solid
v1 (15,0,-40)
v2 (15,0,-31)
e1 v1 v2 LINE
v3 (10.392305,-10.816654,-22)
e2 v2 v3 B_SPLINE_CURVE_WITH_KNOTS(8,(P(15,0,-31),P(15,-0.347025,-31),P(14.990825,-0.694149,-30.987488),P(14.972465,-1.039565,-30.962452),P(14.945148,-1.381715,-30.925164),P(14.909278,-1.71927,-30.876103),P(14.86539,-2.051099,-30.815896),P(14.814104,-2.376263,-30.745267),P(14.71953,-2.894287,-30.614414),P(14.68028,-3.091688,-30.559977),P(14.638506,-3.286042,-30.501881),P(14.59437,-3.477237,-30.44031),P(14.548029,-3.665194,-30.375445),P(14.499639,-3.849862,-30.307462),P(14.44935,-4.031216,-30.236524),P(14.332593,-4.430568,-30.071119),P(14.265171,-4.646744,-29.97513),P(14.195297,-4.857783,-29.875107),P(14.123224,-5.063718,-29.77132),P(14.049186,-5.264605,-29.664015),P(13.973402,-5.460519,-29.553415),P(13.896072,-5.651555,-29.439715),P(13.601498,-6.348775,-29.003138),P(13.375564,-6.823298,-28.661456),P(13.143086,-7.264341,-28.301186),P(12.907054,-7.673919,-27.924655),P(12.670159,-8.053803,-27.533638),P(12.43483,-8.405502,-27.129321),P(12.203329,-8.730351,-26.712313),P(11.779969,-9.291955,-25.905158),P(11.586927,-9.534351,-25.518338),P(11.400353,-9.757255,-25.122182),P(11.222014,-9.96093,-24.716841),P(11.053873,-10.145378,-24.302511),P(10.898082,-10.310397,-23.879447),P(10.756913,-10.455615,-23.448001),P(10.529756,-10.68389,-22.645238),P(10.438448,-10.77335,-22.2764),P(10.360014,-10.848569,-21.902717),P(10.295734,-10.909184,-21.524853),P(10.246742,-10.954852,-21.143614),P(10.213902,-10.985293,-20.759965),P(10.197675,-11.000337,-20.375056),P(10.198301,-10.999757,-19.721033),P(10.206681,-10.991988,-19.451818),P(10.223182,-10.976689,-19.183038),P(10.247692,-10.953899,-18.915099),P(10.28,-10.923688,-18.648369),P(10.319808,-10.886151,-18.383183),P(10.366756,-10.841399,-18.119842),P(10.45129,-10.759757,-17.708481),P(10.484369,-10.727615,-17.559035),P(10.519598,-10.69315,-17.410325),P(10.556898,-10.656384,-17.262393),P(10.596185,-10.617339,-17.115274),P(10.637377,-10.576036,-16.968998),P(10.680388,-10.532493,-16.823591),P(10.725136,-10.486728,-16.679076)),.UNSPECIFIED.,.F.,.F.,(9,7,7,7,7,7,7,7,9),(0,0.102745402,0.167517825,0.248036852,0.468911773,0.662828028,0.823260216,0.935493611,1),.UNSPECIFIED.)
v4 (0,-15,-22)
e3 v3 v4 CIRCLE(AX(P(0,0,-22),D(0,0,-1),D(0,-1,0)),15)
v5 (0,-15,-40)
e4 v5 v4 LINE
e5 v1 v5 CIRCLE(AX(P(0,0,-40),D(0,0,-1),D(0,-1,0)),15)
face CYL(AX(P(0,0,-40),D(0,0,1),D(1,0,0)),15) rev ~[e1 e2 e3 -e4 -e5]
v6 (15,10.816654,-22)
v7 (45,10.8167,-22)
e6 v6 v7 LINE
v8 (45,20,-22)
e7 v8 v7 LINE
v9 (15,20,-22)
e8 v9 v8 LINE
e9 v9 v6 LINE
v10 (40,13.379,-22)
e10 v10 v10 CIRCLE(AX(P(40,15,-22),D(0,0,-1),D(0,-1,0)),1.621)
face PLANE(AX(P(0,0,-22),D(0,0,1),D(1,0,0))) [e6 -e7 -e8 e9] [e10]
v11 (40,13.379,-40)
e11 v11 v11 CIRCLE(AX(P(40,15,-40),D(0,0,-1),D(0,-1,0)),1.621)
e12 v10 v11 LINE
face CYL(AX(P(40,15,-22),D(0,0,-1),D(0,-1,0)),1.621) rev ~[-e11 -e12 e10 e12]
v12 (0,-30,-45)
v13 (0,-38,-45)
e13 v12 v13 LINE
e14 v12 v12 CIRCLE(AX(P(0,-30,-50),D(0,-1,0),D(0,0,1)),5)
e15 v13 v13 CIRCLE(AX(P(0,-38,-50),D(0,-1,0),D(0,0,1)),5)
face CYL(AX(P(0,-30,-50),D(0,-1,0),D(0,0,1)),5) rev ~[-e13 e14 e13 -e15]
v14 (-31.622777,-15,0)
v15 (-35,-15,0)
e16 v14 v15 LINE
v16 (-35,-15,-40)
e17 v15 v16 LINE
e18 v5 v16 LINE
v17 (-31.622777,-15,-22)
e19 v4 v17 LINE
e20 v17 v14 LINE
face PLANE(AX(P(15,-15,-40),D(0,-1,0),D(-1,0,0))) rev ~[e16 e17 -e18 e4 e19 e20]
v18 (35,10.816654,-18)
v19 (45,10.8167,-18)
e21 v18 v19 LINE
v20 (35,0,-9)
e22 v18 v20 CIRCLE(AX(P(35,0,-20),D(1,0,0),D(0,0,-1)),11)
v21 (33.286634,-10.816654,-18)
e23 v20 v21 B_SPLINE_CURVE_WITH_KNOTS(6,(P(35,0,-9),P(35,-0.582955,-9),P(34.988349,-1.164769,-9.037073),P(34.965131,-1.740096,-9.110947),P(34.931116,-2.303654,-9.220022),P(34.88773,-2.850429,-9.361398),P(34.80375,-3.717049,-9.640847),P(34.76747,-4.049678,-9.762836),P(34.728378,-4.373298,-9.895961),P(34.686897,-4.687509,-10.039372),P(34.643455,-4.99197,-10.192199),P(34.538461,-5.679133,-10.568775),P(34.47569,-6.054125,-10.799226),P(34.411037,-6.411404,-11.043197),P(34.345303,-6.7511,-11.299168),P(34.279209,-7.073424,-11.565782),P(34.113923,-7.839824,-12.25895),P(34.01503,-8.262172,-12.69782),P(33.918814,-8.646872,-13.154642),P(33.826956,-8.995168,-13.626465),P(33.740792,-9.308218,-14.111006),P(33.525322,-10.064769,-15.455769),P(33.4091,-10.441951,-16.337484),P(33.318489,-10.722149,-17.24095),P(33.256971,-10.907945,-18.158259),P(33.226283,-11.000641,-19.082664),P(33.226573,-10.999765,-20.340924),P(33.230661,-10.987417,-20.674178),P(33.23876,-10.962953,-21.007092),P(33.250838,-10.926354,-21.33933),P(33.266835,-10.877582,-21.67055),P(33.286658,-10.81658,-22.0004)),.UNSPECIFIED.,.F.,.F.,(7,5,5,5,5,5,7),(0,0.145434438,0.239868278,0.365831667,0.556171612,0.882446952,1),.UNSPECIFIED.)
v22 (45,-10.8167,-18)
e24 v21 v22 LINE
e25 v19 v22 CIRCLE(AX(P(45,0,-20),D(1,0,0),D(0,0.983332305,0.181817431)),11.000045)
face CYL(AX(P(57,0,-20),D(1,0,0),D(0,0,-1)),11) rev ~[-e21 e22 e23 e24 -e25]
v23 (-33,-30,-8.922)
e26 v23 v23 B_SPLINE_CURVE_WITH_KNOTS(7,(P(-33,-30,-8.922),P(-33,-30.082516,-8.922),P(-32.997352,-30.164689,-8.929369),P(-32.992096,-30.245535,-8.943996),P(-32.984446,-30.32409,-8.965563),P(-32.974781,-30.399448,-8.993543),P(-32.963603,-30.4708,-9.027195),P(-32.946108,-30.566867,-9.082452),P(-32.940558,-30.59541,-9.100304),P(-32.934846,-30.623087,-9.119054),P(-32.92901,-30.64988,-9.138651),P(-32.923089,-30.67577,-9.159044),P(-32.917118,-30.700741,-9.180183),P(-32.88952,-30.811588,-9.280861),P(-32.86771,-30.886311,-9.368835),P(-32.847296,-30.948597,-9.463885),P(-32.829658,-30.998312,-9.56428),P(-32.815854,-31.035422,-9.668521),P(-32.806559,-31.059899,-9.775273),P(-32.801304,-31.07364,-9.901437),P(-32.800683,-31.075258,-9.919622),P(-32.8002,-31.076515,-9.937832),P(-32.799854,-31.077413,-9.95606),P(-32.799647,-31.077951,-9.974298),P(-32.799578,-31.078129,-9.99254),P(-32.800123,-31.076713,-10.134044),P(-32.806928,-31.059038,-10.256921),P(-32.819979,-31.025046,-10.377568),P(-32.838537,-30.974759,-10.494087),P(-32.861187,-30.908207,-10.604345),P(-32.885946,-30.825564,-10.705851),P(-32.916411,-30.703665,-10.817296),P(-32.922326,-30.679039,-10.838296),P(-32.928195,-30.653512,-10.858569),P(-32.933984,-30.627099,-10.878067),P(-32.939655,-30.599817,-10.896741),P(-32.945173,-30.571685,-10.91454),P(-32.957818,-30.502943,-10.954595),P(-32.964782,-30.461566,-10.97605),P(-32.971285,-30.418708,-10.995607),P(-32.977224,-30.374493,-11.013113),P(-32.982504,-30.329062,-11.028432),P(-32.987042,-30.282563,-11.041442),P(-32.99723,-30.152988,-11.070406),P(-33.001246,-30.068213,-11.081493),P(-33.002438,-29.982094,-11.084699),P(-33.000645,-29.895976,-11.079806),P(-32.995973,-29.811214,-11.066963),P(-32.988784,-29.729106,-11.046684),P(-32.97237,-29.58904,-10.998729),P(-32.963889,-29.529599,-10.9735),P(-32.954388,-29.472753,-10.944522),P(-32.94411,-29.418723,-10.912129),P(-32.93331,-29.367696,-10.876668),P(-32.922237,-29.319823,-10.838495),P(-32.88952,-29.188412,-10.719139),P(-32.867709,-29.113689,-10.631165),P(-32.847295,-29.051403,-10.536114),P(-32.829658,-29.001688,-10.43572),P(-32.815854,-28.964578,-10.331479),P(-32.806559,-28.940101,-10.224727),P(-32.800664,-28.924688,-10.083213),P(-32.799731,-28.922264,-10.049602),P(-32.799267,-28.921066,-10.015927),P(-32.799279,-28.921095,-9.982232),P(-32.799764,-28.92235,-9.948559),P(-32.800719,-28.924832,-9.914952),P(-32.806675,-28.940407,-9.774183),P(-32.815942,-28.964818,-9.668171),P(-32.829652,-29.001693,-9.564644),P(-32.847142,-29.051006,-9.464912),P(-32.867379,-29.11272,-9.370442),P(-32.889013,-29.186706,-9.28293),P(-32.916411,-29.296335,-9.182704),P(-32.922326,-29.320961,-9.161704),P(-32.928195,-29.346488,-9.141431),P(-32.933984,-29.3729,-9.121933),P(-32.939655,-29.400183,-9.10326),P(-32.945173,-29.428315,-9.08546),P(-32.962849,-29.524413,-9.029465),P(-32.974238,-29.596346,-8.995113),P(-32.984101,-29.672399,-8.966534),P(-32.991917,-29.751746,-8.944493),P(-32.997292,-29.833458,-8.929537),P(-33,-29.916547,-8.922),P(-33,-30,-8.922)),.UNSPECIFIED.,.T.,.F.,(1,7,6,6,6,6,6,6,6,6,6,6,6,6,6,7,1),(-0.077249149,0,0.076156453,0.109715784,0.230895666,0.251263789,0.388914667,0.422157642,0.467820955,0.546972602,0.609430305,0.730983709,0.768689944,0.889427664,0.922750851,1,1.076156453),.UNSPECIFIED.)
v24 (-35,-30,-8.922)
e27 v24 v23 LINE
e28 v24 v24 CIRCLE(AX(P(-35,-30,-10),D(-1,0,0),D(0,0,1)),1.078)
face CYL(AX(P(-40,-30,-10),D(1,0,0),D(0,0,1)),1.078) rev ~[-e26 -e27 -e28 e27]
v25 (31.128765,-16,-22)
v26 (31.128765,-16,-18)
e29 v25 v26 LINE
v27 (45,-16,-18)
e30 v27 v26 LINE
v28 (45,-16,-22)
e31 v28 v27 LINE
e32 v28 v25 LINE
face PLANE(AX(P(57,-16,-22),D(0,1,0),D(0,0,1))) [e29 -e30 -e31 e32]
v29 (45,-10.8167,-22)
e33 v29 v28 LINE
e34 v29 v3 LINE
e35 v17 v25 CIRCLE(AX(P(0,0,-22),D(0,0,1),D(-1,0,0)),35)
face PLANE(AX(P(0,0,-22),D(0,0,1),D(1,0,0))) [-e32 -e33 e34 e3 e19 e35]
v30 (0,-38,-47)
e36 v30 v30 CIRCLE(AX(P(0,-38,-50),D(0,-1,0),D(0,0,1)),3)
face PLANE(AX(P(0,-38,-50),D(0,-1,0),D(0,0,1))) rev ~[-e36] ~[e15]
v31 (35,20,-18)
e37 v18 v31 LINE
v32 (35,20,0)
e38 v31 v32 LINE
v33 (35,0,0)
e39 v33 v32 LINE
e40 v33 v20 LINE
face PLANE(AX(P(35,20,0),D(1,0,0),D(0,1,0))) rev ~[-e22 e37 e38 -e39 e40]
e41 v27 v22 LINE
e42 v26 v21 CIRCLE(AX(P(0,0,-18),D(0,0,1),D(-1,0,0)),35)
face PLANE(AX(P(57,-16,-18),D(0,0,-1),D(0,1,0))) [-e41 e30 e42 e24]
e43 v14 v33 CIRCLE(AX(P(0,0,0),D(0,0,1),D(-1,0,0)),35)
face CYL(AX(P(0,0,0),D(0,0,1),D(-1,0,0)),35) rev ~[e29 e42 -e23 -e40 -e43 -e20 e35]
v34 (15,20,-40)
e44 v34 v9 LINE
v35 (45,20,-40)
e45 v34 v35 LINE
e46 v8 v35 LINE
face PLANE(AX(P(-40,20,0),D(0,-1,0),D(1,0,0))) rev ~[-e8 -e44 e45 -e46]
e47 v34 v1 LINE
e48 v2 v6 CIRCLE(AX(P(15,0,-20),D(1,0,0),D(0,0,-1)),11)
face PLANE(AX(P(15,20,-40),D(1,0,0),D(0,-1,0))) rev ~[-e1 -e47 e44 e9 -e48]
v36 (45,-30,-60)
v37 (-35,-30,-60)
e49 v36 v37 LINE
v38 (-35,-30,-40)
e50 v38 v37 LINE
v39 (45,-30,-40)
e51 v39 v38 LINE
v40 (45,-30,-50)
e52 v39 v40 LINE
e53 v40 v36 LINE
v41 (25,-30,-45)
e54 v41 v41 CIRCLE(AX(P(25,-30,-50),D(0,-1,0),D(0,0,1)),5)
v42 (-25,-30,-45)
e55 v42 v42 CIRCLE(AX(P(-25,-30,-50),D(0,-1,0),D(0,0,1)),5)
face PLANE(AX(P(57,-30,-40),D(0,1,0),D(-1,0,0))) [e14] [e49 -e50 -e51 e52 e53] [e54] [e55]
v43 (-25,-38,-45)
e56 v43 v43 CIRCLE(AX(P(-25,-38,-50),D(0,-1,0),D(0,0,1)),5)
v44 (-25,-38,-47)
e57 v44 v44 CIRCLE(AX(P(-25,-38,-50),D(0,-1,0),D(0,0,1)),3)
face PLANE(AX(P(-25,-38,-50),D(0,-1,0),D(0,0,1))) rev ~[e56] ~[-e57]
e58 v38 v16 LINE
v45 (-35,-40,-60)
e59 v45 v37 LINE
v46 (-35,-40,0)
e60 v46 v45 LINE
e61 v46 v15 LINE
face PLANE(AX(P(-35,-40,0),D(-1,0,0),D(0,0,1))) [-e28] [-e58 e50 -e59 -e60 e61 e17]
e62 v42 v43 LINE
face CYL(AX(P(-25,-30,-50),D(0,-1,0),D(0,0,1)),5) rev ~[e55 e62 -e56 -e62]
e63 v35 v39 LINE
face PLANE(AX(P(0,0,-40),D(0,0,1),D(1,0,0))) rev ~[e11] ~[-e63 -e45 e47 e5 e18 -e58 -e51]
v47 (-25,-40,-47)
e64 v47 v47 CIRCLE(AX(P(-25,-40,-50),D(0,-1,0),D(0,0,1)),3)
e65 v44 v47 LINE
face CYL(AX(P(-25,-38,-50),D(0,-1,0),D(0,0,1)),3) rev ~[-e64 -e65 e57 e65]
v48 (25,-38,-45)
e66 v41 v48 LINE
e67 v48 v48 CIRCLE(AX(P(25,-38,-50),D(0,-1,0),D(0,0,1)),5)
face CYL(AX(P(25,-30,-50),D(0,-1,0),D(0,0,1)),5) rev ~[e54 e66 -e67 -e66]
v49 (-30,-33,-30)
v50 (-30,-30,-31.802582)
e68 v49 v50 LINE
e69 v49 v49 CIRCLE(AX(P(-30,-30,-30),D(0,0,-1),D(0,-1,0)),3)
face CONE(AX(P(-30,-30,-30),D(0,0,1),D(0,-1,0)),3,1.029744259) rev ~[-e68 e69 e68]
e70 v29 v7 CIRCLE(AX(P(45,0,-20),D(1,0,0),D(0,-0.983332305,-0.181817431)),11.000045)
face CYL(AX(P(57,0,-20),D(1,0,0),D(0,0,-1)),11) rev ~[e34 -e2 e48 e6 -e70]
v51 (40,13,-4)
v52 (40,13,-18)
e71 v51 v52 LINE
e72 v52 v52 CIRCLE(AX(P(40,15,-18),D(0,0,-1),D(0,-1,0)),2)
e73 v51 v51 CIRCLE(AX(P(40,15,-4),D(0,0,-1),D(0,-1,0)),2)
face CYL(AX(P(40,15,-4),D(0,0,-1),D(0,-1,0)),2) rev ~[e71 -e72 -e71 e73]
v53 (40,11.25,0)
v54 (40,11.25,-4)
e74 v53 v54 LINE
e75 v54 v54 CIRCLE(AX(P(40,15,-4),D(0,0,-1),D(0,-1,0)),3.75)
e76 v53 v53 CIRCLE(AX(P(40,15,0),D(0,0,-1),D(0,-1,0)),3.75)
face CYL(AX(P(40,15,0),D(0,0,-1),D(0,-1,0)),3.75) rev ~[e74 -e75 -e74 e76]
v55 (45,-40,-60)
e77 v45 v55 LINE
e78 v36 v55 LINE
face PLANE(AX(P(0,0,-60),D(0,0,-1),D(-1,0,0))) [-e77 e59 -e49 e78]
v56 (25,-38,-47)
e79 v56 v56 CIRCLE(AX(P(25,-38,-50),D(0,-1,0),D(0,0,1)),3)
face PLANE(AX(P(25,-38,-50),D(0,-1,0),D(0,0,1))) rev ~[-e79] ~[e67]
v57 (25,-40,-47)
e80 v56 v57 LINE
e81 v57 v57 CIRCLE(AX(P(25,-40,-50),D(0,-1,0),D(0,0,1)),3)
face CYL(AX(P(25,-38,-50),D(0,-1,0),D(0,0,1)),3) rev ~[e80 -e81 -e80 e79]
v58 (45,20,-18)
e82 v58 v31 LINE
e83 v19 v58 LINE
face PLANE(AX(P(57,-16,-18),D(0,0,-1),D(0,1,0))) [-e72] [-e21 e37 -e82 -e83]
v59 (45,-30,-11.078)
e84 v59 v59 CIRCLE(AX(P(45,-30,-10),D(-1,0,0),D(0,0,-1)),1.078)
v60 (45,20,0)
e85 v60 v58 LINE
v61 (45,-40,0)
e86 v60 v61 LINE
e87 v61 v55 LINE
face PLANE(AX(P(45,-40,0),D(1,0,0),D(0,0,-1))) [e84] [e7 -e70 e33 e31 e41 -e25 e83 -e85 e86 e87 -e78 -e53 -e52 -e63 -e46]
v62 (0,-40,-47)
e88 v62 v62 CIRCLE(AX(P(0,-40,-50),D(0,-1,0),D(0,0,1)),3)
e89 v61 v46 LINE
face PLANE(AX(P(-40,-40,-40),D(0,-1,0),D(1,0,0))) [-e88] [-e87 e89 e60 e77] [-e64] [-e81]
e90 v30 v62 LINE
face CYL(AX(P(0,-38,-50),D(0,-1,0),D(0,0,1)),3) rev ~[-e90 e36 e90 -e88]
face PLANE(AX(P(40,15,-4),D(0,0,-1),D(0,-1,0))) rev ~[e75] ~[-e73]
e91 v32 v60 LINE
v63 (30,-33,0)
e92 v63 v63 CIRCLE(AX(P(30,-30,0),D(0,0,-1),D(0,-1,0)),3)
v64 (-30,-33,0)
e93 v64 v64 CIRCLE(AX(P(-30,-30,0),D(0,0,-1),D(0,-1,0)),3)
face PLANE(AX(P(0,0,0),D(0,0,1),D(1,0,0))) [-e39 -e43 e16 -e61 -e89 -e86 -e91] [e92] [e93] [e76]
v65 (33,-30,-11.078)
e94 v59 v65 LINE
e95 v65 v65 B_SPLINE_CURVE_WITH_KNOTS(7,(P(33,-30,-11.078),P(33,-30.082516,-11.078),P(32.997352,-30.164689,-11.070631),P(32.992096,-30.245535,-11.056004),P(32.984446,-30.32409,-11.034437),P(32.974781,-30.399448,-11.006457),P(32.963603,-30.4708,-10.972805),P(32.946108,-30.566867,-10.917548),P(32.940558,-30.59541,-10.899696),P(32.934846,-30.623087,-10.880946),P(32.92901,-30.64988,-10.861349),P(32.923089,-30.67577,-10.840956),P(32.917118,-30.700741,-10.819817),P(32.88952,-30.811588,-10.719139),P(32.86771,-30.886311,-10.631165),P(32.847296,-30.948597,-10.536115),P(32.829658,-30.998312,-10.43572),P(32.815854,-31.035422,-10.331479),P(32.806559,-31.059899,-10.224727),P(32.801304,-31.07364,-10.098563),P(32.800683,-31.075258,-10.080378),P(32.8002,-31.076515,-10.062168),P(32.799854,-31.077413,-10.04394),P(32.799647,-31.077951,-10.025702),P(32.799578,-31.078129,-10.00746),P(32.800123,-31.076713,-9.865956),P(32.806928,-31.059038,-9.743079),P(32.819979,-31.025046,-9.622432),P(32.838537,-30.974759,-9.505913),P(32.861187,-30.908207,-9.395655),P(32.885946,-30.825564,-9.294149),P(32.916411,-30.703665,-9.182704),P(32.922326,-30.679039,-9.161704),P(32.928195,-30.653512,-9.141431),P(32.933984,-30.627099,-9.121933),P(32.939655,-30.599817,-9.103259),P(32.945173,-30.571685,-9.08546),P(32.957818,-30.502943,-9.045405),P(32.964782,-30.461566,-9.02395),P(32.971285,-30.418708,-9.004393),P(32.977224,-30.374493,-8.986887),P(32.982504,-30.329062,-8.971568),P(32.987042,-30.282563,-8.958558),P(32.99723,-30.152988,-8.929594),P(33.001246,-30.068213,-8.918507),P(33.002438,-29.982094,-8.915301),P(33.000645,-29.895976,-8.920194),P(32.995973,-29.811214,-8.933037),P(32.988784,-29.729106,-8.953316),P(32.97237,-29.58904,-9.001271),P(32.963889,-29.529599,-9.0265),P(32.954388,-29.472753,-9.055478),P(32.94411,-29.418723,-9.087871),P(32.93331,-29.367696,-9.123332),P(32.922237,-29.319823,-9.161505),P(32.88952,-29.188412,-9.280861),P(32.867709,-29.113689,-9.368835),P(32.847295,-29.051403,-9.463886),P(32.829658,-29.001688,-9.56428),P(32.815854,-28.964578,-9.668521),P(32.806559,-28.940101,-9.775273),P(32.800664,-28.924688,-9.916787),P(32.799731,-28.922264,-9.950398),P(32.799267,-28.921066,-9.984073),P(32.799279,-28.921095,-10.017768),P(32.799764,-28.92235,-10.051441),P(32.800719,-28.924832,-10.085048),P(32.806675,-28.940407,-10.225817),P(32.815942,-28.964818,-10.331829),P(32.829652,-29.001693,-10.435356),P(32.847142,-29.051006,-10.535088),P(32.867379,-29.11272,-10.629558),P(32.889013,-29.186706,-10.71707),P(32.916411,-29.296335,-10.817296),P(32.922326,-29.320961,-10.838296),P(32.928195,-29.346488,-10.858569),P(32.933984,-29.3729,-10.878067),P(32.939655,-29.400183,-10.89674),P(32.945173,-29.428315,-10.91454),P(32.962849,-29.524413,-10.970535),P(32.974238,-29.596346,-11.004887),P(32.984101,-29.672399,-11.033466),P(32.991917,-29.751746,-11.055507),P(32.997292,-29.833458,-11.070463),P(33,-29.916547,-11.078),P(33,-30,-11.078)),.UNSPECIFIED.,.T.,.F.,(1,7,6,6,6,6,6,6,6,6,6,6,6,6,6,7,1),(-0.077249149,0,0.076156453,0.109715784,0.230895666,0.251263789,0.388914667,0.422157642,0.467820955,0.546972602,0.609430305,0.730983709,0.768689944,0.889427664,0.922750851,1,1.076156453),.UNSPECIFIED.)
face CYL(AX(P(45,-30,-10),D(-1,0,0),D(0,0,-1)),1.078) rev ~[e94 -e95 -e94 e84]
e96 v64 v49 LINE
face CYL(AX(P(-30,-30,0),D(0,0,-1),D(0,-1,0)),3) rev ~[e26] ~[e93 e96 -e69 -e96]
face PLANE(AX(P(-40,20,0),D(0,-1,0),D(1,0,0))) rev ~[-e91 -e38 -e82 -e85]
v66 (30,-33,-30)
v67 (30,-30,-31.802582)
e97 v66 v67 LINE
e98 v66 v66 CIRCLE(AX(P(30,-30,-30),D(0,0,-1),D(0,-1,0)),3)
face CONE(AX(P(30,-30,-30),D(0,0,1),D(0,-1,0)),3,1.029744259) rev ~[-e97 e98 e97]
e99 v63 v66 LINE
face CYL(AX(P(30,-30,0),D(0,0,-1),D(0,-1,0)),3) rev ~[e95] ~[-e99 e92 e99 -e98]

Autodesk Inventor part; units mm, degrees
ref_plane "YZ Plane" through (0, 0, 0) normal (1, 0, 0) x (0, 1, 0)
ref_plane "XZ Plane" through (0, 0, 0) normal (0, 1, 0) x (-1, 0, 0)
ref_plane "XY Plane" through (0, 0, 0) normal (0, 0, 1) x (1, 0, 0)
sketch "Sketch1" plane through (0, 0, 0) normal (0, 0, 1) x (1, 0, 0)
  line L0 (0, 32) -> (0, -52) construction
  line L1 (-59.4, 0) -> (76.4, 0) construction
  line L2 (-40, 20) -> (57, 20)
  line L3 (57, 20) -> (57, -40)
  line L4 (57, -40) -> (-40, -40)
  line L5 (-40, -40) -> (-40, 20)
  point P0 (0, 0)
  dimension "d0" = 20
  dimension "d1" = 40
  dimension "d2" = 40
  dimension "d3" = 57
extrude "Extrusion1" add sketch "Sketch1" against normal blind 40
sketch "Sketch2" plane through (0, 0, 0) normal (0, 0, 1) x (1, 0, 0)
  line L0 (-40, 20) -> (57, 20) construction
  line L1 (-40, -40) -> (-40, 20) construction
  line L2 (57, -40) -> (-40, -40) construction
  line L3 (57, 20) -> (57, -40) construction
  line L4 (0, 98) -> (0, -63) construction
  line L5 (-59.4, 0) -> (76.4, 0) construction
  line L6 (0, 40) -> (0, 0) construction
  line L7 (-40, 20) -> (57, 20) projected
  line L8 (-35, 40) -> (-35, 0)
  line L9 (35, 0) -> (35, 40)
  arc A0 (35, 40) -> (-35, 40) centre (0, 40) ccw
  arc A1 (-35, 0) -> (35, 0) centre (0, 0) ccw
  point P0 (0, 20)
  dimension "d6" = 70
extrude "Extrusion2" cut sketch "Sketch2" against normal blind 22
sketch "Sketch3" plane through (57, -40, 0) normal (1, 0, 0) x (0, 0, -1)
  line L0 (0, 60) -> (0, 0) construction
  line L1 (0, 0) -> (40, 0) construction
  line L2 (40, 60) -> (40, 0) construction
  line L3 (0, 60) -> (40, 60) construction
  line L4 (0, 40) -> (40, 40) construction
  line L5 (40, 0) -> (40, 60) construction
  line L6 (0, 60) -> (40, 60) construction
  line L7 (20, 60) -> (20, 0) construction
  circle A0 centre (20, 40) radius 11
  dimension "d9" = 22
extrude "Extrusion3" cut sketch "Sketch3" against normal blind 65
sketch "Sketch4" plane through (57, -40, 0) normal (1, 0, 0) x (0, 0, -1)
  circle A0 centre (20, 40) radius 11 construction
  line L0 (0, 60) -> (0, 0) construction
  line L1 (0, 0) -> (40, 0) construction
  line L2 (40, 60) -> (40, 0) construction
  line L3 (0, 60) -> (40, 60) construction
  line L4 (0, 60) -> (40, 60) construction
  line L5 (20, 60) -> (20, 0) construction
  line L6 (0, 0) -> (40, 0) construction
  line L7 (0, 40) -> (40, 40) construction
  line L8 (18, 60) -> (22, 60)
  line L9 (22, 60) -> (22, 24)
  line L10 (22, 24) -> (18, 24)
  line L11 (18, 24) -> (18, 60)
  dimension "d12" = 16
  dimension "d13" = 4
extrude "Extrusion4" cut sketch "Sketch4" against normal blind 70
sketch "Sketch6" plane through (0, 0, 0) normal (0, 0, 1) x (1, 0, 0)
  line L0 (0, 44) -> (0, -54) construction
  line L1 (-59.4, 0) -> (76.4, 0) construction
  line L2 (-30, 30) -> (30, 30) construction
  line L3 (30, 30) -> (30, -30) construction
  line L4 (30, -30) -> (-30, -30) construction
  line L5 (-30, -30) -> (-30, 30) construction
  point P0 (0, 0)
  dimension "d19" = 60
  dimension "d20" = 60
hole "Hole1" at (-30, -30, 0) at (30, -30, 0) direction (0, 0, -1) diameter 6 depth 30 tip angle 118
sketch "Sketch7" plane through (0, 0, -40) normal (0, 0, -1) x (-1, 0, 0)
  line L0 (40, 20) -> (-57, 20) construction
  line L1 (-57, 20) -> (-57, -40) construction
  line L2 (-57, -40) -> (40, -40) construction
  line L3 (40, -40) -> (40, 20) construction
  line L4 (0, -52) -> (0, 32) construction
  line L5 (-76.4, 0) -> (59.4, 0) construction
  line L6 (40, 20) -> (-15, 20)
  line L7 (-15, 20) -> (-15, -15)
  line L8 (-15, -15) -> (40, -15)
  line L9 (40, -15) -> (40, 20)
  point P0 (0, 0)
  dimension "d28" = 15
  dimension "d29" = 15
extrude "Extrusion6" cut sketch "Sketch7" against normal up to next
fillet "Fillet1" radius 15 1 edges at (15, -15, -31)
sketch "Sketch8" plane through (0, 0, -40) normal (0, 0, -1) x (-1, 0, 0)
  line L0 (40, -15) -> (0, -15) construction
  arc A0 (-15, 0) -> (0, -15) centre (0, 0) ccw construction
  line L1 (-15, 0) -> (-15, 20) construction
  line L2 (-15, 20) -> (-57, 20) construction
  line L3 (-57, 20) -> (-57, -40) construction
  line L4 (-57, -40) -> (40, -40) construction
  line L5 (40, -40) -> (40, -15) construction
  line L6 (-57, 20) -> (-57, -40) projected
  line L7 (40, -40) -> (-57, -40)
  line L8 (-57, -40) -> (-57, -30)
  line L9 (-57, -30) -> (40, -30)
  line L10 (40, -30) -> (40, -40)
  point P0 (0, 0)
  dimension "d33" = 10
extrude "Extrusion7" add sketch "Sketch8" along normal blind 20
sketch "Sketch13" plane through (-40, -30, -40) normal (0, 1, 0) x (1, 0, 0)
  line L0 (40, 32) -> (40, -52) construction
  line L1 (97, 0) -> (0, 0) construction
  line L2 (97, 0) -> (97, 20) construction
  line L3 (0, 20) -> (97, 20) construction
  line L4 (0, 0) -> (0, 20) construction
  line L5 (97, -40) -> (97, 20) construction
  line L6 (97, 10) -> (0, 10) construction
  point P0 (40, -40)
  point P1 (40, 10)
  point P2 (65, 10)
  point P3 (90, 10)
  point P4 (15, 10)
  dimension "d60" = 25
  dimension "d61" = 25
  dimension "d62" = 25
hole "Hole4" at (0, -30, -50) at (25, -30, -50) at (50, -30, -50) at (-25, -30, -50) direction (0, -1, 0) diameter 6 end through all counterbore diameter 10 counterbore depth 8
sketch "Sketch14" plane through (0, 0, 0) normal (0, 0, 1) x (1, 0, 0)
  line L0 (-31.6228, -15) -> (-40, -15) construction
  line L1 (-40, -40) -> (-40, -15) construction
  line L2 (57, -40) -> (-40, -40) construction
  line L3 (57, 20) -> (57, -40) construction
  line L4 (35, 20) -> (57, 20) construction
  line L5 (35, 20) -> (35, 0) construction
  arc A0 (-31.6228, -15) -> (35, 0) centre (0, 0) ccw construction
  circle A1 centre (30, -30) radius 3 construction
  circle A2 centre (-30, -30) radius 3 construction
  line L6 (57, 15) -> (35, 15) construction
  point P0 (40, 15)
  dimension "d70" = 5
  dimension "d106" = 5
hole "Hole5" at (40, 15, 0) direction (0, 0, -1) diameter 4 end up to surface counterbore diameter 7.5 counterbore depth 4
sketch "Sketch15" plane through (0, 0, -22) normal (0, 0, 1) x (1, 0, 0)
  circle A0 centre (40, 15) radius 2 construction
  point P0 (0, 0)
hole "Hole6" at (40, 15, -22) direction (0, 0, -1) diameter 3.242 end through all thread size "M4x0.7" class "6H" standard "ANSI Metric M Profile"
sketch "Sketch16" plane through (-40, -40, 0) normal (-1, 0, 0) x (0, 0, 1)
  line L0 (0, 25) -> (-40, 25) construction
  line L1 (-40, 10) -> (-40, 25) construction
  line L2 (-40, 10) -> (-60, 10) construction
  line L3 (-60, 0) -> (-60, 10) construction
  line L4 (0, 0) -> (-60, 0) construction
  line L5 (0, 0) -> (0, 25) construction
  line L6 (0, 13) -> (0, 7) construction
  line L7 (-30, 7) -> (-30, 13) construction
  line L8 (-30, 10) -> (0, 10) construction
  point P0 (0, 40)
  point P1 (-10, 10)
  dimension "d86" = 10
hole "Hole7" at (-40, -30, -10) direction (1, 0, 0) diameter 2.156 depth 8.865 tip angle 118 thread size "4-40 UNC" class "2B" standard "ANSI Unified Screw Threads"
sketch "Sketch18" plane through (-40, -40, 0) normal (-1, 0, 0) x (0, 0, 1)
  circle A0 centre (-10, 10) radius 1.078 projected
  line L0 (0, 25) -> (-40, 25) projected
  line L1 (-40, 10) -> (-40, 25) projected
  line L2 (-40, 10) -> (-60, 10) projected
  line L3 (-60, 0) -> (-60, 10) projected
  line L4 (0, 0) -> (-60, 0) projected
  line L5 (0, 0) -> (0, 25) projected
  point P0 (0, 40)
extrude "Extrusion10" cut sketch "Sketch18" against normal blind 5
sketch "Sketch19" plane through (57, -40, 0) normal (1, 0, 0) x (0, 0, -1)
  line L0 (18, 50.8167) -> (18, 60) projected
  line L1 (0, 60) -> (18, 60) projected
  line L2 (0, 60) -> (0, 0) projected
  line L3 (0, 0) -> (60, 0) projected
  line L4 (60, 10) -> (60, 0) projected
  line L5 (40, 10) -> (60, 10) projected
  line L6 (40, 60) -> (40, 10) projected
  line L7 (22, 60) -> (40, 60) projected
  line L8 (22, 60) -> (22, 50.8167) projected
  arc A0 (22, 29.1833) -> (22, 50.8167) centre (20, 40) ccw projected
  line L9 (22, 29.1833) -> (22, 24) projected
  line L10 (22, 24) -> (18, 24) projected
  line L11 (18, 24) -> (18, 29.1833) projected
  arc A1 (18, 50.8167) -> (18, 29.1833) centre (20, 40) ccw projected
  point P0 (0, 40)
extrude "Extrusion11" cut sketch "Sketch19" against normal blind 12
sketch "Sketch20" plane through (45, -40, 0) normal (1, 0, 0) x (0, 0, -1)
  line L0 (18, 60) -> (18, 50.8167) construction
  line L1 (0, 60) -> (18, 60) construction
  line L2 (0, 0) -> (0, 60) construction
  line L3 (60, 0) -> (0, 0) construction
  line L4 (60, 10) -> (60, 0) construction
  line L5 (40, 10) -> (60, 10) construction
  line L6 (40, 60) -> (40, 10) construction
  line L7 (22, 60) -> (40, 60) construction
  line L8 (22, 50.8167) -> (22, 60) construction
  arc A0 (22, 29.1833) -> (22, 50.8167) centre (20, 40) ccw construction
  line L9 (22, 24) -> (22, 29.1833) construction
  line L10 (18, 24) -> (22, 24) construction
  line L11 (18, 29.1833) -> (18, 24) construction
  arc A1 (18, 50.8167) -> (18, 29.1833) centre (20, 40) ccw construction
  line L12 (0, 7) -> (0, 13) construction
  line L13 (30, 13) -> (30, 7) construction
  circle A2 centre (10, 10) radius 1.078 construction
  point P0 (0, 40)
hole "Hole9" at (45, -30, -10) direction (-1, 0, 0) diameter 2.156 depth 15 tip angle 118 thread size "4-40 UNC" class "2B" standard "ANSI Unified Screw Threads"
properties part number "Galvomount-22mm-diameter-Thorlabs-Left"
